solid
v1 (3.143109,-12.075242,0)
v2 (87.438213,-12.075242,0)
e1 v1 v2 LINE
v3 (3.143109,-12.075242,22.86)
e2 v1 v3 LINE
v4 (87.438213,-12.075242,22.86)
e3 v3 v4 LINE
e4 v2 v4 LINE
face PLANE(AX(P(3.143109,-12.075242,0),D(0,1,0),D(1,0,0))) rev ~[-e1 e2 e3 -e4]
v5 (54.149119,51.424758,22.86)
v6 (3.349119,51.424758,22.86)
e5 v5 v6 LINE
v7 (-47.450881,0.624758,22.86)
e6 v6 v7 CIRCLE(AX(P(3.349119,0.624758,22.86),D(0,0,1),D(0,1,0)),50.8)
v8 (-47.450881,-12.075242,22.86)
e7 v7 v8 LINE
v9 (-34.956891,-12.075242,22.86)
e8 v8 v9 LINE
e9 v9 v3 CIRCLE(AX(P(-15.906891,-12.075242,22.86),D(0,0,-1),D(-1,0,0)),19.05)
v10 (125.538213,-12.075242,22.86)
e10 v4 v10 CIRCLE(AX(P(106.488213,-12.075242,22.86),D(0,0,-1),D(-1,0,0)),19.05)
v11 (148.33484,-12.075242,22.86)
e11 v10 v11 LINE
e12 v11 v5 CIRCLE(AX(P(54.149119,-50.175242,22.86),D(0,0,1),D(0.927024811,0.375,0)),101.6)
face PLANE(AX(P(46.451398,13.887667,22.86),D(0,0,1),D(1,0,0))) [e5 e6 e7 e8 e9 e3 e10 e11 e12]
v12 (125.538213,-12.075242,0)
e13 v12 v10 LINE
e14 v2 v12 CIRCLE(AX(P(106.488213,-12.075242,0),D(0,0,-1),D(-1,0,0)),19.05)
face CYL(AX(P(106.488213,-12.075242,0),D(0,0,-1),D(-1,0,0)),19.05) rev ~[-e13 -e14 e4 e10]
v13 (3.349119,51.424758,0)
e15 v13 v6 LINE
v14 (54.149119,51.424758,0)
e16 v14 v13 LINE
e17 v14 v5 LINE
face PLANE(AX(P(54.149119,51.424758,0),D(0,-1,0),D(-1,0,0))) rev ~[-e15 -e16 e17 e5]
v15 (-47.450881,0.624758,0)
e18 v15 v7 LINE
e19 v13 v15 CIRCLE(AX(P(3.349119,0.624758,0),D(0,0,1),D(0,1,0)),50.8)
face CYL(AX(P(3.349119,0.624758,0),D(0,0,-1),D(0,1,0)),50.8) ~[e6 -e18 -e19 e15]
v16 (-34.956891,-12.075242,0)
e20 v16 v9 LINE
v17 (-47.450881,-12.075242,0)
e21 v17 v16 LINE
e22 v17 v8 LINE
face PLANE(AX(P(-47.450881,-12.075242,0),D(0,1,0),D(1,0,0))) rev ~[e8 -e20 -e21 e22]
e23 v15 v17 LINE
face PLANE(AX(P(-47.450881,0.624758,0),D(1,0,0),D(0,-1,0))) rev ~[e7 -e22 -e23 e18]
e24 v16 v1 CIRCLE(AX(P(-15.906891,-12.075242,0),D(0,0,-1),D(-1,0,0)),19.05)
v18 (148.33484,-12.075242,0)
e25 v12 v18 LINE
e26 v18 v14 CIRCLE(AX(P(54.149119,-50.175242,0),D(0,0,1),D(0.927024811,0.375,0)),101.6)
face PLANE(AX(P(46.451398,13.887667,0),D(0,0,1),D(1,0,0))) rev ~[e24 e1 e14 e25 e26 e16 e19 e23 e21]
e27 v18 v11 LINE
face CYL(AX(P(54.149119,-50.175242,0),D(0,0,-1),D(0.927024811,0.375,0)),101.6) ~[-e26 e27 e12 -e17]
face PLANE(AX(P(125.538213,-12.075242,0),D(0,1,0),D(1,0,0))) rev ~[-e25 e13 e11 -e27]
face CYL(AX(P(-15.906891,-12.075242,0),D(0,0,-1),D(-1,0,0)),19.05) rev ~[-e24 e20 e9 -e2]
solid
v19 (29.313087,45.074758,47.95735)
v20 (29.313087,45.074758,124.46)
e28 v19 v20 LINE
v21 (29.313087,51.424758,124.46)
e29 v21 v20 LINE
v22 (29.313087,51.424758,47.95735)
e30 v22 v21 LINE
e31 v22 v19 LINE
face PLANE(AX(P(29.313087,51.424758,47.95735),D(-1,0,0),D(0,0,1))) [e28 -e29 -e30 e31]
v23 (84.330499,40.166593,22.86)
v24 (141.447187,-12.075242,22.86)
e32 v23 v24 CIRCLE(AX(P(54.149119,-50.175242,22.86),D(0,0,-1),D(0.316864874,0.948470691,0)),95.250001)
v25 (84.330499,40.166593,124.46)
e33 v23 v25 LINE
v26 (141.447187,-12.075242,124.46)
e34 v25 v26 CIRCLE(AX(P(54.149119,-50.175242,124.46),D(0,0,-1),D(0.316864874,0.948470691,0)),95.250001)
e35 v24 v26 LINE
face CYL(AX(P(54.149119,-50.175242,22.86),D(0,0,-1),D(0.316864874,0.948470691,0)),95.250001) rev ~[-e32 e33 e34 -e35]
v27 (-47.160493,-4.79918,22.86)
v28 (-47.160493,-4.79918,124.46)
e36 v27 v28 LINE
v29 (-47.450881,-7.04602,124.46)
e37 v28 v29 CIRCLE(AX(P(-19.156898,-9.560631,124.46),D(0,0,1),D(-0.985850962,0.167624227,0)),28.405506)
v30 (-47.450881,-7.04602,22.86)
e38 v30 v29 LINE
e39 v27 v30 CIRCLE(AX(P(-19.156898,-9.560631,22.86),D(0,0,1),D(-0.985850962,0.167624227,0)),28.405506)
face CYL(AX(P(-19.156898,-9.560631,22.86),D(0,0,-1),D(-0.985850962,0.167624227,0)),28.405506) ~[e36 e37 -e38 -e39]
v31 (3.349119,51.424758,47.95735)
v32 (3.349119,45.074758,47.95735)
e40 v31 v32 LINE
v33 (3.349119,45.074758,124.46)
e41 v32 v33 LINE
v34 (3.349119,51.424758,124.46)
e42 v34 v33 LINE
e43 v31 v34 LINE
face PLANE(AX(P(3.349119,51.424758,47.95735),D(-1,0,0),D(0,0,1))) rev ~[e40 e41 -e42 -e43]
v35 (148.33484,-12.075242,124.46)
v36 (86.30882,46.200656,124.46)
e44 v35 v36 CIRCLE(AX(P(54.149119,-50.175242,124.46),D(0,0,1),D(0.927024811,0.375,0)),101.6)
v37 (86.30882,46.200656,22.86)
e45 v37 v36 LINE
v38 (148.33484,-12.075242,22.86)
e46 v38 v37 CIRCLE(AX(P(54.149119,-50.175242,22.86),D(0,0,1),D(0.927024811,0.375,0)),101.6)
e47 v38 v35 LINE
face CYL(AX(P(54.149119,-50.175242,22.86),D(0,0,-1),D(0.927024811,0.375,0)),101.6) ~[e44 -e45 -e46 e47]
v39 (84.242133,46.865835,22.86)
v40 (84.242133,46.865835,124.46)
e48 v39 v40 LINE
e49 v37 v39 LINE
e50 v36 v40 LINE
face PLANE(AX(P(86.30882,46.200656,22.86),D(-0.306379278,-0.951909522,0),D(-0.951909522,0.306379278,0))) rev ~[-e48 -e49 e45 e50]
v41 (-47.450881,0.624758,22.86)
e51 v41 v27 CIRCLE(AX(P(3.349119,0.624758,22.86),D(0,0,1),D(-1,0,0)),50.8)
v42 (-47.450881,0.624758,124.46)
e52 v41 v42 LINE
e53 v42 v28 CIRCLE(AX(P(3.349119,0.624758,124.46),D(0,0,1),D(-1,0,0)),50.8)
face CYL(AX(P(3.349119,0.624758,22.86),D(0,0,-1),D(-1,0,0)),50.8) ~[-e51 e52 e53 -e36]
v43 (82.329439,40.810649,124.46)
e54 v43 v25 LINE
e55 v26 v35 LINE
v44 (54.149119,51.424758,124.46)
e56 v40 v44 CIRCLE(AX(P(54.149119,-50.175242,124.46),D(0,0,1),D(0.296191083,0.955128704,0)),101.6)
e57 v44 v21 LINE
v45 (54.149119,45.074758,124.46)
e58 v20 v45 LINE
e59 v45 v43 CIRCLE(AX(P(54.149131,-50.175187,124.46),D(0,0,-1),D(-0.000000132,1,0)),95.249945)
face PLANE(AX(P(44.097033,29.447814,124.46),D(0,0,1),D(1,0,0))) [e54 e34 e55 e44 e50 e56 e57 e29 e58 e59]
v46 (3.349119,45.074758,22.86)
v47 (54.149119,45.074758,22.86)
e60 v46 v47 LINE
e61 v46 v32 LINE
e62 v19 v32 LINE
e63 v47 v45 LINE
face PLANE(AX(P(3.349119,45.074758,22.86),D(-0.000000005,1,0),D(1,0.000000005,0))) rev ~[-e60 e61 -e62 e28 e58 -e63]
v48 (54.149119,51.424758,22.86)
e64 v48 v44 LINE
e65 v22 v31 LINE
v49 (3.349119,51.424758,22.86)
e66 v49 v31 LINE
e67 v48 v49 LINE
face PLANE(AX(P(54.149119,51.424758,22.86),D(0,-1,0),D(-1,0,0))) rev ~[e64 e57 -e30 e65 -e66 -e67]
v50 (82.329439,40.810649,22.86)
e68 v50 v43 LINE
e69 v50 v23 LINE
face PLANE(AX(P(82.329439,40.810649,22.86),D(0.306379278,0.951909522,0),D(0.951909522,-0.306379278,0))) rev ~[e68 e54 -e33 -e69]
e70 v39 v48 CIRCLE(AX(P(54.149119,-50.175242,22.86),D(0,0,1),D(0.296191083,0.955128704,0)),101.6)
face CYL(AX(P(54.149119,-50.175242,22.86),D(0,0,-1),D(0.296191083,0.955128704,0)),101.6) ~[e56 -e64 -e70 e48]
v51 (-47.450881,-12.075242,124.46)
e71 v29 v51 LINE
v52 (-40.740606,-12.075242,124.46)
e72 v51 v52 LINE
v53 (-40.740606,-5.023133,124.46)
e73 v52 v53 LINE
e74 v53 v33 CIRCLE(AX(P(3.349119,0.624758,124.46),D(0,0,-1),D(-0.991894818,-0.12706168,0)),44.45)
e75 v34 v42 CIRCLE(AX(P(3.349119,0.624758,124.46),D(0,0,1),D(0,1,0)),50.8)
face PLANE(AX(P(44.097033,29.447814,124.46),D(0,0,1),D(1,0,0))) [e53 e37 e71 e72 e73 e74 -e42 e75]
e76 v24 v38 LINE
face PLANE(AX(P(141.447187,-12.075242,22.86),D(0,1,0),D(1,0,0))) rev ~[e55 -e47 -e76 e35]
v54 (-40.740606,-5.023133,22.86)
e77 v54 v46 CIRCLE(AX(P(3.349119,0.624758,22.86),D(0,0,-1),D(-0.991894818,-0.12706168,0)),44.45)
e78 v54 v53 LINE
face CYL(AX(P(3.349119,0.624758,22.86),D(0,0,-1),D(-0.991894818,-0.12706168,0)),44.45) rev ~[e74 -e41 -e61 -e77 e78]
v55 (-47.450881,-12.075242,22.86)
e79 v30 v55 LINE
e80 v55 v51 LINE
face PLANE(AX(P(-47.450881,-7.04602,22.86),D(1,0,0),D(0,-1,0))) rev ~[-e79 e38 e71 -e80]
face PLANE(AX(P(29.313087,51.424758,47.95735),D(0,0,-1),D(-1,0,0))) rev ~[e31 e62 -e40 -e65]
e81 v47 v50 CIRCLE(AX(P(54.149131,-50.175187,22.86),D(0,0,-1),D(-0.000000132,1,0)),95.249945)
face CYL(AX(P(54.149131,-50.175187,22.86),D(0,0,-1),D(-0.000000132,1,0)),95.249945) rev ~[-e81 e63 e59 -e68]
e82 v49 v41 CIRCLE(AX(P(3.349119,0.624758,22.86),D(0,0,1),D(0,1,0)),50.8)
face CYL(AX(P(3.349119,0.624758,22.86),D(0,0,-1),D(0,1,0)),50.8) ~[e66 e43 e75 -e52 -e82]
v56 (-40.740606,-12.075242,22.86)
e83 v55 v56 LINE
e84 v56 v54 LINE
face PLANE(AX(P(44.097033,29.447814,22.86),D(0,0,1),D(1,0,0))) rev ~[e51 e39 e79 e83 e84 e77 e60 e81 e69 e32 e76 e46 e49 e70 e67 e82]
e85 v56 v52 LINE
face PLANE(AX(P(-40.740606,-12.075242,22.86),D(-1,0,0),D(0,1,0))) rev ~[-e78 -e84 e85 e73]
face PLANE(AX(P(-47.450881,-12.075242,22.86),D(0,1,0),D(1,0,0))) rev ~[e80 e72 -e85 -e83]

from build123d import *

# Parameters (mm, degrees)
F1_DEPTH = 22.86
F3_DEPTH = 101.6
F4_W     = 25.9639685869
F4_H     = 76.5026504314
F5_DEPTH = 25.4


# Not quite as in the source:
# - ends of sketch curves that miss each other by under 0.0002 mm in the source are joined


with BuildPart() as f1:
    # F0 (on Top) → F1 (new body)
    with BuildSketch(Plane.XY):
        with BuildLine():
            Line((54.1491188765, 51.4247583449), (3.3491188765, 51.4247583449))
            ThreePointArc((3.3491188765, 51.4247583449), (-32.5719056078, 36.5457828292), (-47.4508811235, 0.6247583449))
            Line((-47.4508811235, 0.6247583449), (-47.4508811235, -12.0752416551))
            Line((-47.4508811235, -12.0752416551), (-34.9568908542, -12.0752416551))
            ThreePointArc((-34.9568908542, -12.0752416551), (-15.9068908542, 6.9747583449), (3.1431091458, -12.0752416551))
            Line((3.1431091458, -12.0752416551), (87.4382129431, -12.0752416551))
            ThreePointArc((87.4382129431, -12.0752416551), (106.4882129431, 6.9747583449), (125.5382129431, -12.0752416551))
            Line((125.5382129431, -12.0752416551), (148.3348396626, -12.0752416551))
            ThreePointArc((148.3348396626, -12.0752416551), (110.945245505, 34.0670280199), (54.1491188765, 51.4247583449))
        make_face()
    extrude(amount=F1_DEPTH)


with BuildPart() as f3:
    # F2 (on face) → F3 (new body)
    with BuildSketch(Plane.XY.offset(22.86)):
        with BuildLine():
            Line((15.9320533276, 51.4247583449), (3.3491188765, 51.4247583449))
            ThreePointArc((3.3491188765, 51.4247583449), (-32.5719056078, 36.5457828292), (-47.4508811235, 0.6247583449))
            ThreePointArc((-47.4508811235, 0.6247583449), (-47.3782321455, -2.091094798), (-47.1604930017, -4.7991800686))
            ThreePointArc((-47.1604930017, -4.7991800686), (-47.3280960303, -5.9197039916), (-47.4508811235, -7.0460203141))
            Line((-47.4508811235, -7.0460203141), (-47.4508811235, -12.0752416551))
            Line((-47.4508811235, -12.0752416551), (-40.7406055237, -12.0752416551))
            Line((-40.7406055237, -12.0752416551), (-40.7406055237, -5.0231332932))
            ThreePointArc((-40.7406055237, -5.0231332932), (-30.0189141756, 29.9910119001), (3.3491188765, 45.0747580933))
            Line((3.3491188765, 45.0747580933), (54.1491188765, 45.0747583449))
            ThreePointArc((54.1491188765, 45.0747583449), (68.3996721284, 44.0026988236), (82.3294388374, 40.8106490516))
            Line((82.3294388374, 40.8106490516), (84.3304985233, 40.1665928591))
            ThreePointArc((84.3304985233, 40.1665928591), (118.4348676457, 20.1092178361), (141.4471872445, -12.0752416551))
            Line((141.4471872445, -12.0752416551), (148.3348396626, -12.0752416551))
            ThreePointArc((148.3348396626, -12.0752416551), (123.7178725829, 23.8703423302), (86.3088204644, 46.2006557144))
            Line((86.3088204644, 46.2006557144), (84.242132955, 46.8658347181))
            ThreePointArc((84.242132955, 46.8658347181), (69.3673093156, 50.2785620546), (54.1491188765, 51.4247583449))
            Line((54.1491188765, 51.4247583449), (36.9653739035, 51.4247583449))
            Line((36.9653739035, 51.4247583449), (15.9320533276, 51.4247583449))
        make_face()
    extrude(amount=F3_DEPTH)

    # F4 (on face) → F5 (cut)
    with BuildSketch(Plane(origin=(0, 51.4247583449, 0), x_dir=(-1, 0, 0), z_dir=(0, 1, 0))):
        with Locations((-16.3311031699, 86.2086747843)):
            Rectangle(F4_W, F4_H)
    extrude(amount=-F5_DEPTH, mode=Mode.SUBTRACT)


solid = Compound([f1.part, f3.part])
